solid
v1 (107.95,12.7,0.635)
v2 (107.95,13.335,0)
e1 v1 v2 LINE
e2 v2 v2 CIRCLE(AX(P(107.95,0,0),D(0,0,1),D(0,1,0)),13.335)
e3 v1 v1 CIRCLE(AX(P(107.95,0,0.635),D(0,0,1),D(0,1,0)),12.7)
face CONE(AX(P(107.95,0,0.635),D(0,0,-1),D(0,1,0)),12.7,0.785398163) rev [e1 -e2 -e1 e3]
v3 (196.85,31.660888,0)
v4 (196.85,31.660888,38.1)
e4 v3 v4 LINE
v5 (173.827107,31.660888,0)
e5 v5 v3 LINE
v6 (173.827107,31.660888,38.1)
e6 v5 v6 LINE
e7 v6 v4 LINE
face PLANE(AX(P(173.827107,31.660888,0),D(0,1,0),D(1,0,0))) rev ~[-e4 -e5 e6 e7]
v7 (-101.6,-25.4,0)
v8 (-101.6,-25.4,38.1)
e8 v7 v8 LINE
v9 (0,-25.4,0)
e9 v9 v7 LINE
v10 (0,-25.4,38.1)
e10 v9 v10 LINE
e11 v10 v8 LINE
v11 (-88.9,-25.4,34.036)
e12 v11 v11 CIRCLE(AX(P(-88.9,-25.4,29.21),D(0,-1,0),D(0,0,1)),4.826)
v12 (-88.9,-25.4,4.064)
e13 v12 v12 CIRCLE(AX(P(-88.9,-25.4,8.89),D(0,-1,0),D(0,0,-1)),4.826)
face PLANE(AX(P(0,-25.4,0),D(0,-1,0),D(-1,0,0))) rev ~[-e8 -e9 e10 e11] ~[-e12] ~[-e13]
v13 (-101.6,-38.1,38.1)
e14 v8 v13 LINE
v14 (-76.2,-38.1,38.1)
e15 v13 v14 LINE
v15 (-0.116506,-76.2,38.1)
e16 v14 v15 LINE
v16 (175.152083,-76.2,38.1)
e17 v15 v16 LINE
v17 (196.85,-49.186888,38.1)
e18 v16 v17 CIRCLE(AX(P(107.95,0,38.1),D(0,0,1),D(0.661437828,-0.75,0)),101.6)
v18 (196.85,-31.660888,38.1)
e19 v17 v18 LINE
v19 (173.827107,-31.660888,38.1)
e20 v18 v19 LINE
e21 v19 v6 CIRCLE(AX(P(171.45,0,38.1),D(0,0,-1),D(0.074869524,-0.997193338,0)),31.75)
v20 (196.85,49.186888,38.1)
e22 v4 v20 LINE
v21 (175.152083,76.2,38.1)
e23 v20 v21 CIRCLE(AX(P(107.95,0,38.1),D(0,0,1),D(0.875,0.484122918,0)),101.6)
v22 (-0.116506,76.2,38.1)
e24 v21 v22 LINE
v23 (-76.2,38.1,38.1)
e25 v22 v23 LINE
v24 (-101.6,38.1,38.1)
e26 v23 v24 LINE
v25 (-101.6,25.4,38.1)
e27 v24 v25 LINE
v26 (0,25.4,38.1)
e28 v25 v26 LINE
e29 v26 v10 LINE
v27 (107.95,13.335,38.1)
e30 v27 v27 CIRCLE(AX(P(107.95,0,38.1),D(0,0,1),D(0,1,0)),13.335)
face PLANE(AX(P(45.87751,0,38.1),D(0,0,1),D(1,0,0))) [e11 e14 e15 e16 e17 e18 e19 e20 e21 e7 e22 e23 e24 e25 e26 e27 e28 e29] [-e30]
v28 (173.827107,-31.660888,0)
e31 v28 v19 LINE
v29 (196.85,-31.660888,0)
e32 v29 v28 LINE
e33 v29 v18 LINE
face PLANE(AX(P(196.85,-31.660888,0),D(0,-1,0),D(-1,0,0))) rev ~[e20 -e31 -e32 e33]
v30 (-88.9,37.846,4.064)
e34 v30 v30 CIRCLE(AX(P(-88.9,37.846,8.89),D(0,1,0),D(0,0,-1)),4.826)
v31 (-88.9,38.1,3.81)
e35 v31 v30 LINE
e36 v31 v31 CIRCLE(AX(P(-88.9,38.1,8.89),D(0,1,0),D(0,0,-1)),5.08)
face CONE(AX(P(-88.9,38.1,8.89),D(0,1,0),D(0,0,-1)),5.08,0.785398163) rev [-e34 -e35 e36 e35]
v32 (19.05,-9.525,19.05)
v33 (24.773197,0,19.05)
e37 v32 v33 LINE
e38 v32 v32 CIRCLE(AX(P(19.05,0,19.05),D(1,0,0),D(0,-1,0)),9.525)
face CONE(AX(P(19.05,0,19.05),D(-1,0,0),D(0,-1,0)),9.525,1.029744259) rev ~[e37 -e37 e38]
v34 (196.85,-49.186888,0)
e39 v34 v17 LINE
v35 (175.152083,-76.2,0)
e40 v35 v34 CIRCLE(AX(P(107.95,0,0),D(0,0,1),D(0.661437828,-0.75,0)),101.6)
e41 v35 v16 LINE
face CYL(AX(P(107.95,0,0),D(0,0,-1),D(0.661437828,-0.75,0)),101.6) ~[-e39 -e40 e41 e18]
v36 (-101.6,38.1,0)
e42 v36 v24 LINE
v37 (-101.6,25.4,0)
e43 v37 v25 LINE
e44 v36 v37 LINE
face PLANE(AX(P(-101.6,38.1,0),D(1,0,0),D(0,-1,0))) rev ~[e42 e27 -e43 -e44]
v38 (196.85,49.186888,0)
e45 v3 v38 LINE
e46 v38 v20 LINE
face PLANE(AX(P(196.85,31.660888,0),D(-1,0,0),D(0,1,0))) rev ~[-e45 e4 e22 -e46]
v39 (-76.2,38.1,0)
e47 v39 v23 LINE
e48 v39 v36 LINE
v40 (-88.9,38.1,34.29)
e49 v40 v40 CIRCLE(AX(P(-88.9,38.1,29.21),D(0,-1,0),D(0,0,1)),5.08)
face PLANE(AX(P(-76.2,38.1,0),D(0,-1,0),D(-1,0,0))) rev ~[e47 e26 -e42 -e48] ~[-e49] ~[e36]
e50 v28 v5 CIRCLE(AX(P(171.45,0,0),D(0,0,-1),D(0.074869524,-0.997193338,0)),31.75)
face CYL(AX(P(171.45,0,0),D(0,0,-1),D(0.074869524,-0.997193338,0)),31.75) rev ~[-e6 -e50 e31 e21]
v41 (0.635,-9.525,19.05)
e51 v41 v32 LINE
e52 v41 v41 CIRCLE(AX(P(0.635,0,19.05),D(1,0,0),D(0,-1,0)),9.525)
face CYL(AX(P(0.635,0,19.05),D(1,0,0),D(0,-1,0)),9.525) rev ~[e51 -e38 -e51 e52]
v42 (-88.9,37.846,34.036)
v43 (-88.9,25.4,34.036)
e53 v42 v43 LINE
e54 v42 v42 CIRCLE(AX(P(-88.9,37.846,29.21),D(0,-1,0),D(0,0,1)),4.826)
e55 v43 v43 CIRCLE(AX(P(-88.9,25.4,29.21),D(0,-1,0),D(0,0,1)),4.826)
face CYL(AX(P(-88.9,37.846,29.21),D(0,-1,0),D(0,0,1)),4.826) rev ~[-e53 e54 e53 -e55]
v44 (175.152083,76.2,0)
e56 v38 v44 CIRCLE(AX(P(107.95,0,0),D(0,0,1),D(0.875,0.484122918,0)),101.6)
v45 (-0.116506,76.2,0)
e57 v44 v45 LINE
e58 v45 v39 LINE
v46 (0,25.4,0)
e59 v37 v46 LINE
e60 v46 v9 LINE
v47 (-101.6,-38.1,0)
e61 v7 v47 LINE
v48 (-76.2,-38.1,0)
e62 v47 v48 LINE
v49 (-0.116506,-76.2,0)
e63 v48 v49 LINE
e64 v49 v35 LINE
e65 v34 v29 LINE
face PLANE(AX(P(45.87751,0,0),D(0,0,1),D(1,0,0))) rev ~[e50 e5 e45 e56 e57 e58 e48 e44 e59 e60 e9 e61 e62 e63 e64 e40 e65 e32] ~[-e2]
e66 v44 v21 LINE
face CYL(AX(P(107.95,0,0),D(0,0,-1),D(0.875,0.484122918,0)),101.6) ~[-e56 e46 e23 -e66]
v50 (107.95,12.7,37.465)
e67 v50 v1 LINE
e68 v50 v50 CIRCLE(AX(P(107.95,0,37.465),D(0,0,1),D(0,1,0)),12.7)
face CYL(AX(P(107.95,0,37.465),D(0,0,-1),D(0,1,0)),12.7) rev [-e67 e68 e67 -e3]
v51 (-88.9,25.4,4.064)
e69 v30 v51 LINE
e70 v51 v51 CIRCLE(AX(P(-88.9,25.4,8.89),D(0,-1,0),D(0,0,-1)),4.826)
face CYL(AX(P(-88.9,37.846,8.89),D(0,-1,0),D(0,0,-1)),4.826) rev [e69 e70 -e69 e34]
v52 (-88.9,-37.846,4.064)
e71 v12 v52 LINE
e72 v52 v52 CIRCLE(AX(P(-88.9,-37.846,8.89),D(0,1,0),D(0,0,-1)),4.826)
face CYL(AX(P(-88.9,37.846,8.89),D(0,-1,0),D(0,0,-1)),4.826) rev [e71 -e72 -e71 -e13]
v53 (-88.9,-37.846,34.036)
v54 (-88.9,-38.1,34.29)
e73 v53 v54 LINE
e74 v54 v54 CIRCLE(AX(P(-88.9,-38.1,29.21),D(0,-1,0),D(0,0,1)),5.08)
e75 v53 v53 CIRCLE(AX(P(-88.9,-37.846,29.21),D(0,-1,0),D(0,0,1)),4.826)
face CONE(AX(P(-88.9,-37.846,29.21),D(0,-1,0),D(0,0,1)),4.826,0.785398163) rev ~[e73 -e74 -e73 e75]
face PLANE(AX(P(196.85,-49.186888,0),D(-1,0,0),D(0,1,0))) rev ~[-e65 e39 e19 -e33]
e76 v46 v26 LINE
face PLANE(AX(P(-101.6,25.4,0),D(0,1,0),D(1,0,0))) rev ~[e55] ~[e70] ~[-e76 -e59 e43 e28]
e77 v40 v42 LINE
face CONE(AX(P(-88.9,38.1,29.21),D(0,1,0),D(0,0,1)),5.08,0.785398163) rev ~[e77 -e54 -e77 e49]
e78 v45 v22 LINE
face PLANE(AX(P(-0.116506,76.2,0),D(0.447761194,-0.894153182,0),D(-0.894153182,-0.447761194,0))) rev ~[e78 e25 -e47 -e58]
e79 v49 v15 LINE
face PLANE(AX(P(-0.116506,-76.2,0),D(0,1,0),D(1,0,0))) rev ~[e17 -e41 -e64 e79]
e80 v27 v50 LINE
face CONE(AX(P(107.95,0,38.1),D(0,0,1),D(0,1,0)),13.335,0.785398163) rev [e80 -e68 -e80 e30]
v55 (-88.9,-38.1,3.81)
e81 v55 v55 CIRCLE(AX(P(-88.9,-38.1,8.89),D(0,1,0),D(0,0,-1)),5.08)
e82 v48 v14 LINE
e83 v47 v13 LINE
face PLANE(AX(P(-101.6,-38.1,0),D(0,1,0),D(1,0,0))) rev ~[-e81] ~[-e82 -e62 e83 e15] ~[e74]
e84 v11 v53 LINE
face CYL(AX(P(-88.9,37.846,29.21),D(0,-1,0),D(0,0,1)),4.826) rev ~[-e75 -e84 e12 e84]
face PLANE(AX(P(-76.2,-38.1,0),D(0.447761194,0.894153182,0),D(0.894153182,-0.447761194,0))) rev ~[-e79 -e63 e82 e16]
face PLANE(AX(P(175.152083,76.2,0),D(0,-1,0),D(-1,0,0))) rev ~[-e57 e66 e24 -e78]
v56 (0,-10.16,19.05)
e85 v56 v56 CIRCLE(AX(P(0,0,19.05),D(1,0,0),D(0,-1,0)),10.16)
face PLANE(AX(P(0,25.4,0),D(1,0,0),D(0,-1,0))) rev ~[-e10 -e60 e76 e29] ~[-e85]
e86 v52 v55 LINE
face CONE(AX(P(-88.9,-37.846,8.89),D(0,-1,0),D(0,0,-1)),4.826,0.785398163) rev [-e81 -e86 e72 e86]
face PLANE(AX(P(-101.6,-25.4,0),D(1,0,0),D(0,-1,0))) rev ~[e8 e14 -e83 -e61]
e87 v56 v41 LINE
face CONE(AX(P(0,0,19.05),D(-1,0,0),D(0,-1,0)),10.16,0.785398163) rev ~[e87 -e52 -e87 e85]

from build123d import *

# Parameters (mm, degrees)
F1_DEPTH = 38.1


# Not quite as in the source:
# - a pattern or mirror of a feature is missing from the dataset's text; its kind, count and spacing are read off the source's solid


with BuildPart() as f1:
    # F0 (on Top) → F1 (new body)
    with BuildSketch(Plane.XY):
        with BuildLine():
            Line((0, 25.4), (0, 0))
            Line((0, 0), (0, -25.4))
            Line((0, -25.4), (-101.6, -25.4))
            Line((-101.6, -25.4), (-101.6, -38.1))
            Line((-101.6, -38.1), (-76.2, -38.1))
            Line((-76.2, -38.1), (-0.1165057322, -76.2))
            Line((-0.1165057322, -76.2), (175.152083301, -76.2))
            ThreePointArc((175.152083301, -76.2), (187.161060787, -63.6252139407), (196.85, -49.1868884968))
            Line((196.85, -49.1868884968), (196.85, -31.6608884968))
            Line((196.85, -31.6608884968), (173.8271074, -31.6608884968))
            ThreePointArc((173.8271074, -31.6608884968), (139.7, 0), (173.8271074, 31.6608884968))
            Line((173.8271074, 31.6608884968), (196.85, 31.6608884968))
            Line((196.85, 31.6608884968), (196.85, 49.1868884968))
            ThreePointArc((196.85, 49.1868884968), (187.161060787, 63.6252139407), (175.152083301, 76.2))
            Line((175.152083301, 76.2), (-0.1165057322, 76.2))
            Line((-0.1165057322, 76.2), (-76.2, 38.1))
            Line((-76.2, 38.1), (-101.6, 38.1))
            Line((-101.6, 38.1), (-101.6, 25.4))
            Line((-101.6, 25.4), (0, 25.4))
        make_face()
    extrude(amount=F1_DEPTH)

    # F3 (on offset) → F4 (revolve, cut)
    with BuildSketch(Plane(origin=(107.95, 0, 0), x_dir=(0, -1, 0), z_dir=(-1, 0, 0))):
        Polygon((-13.335, 0), (0, 0), (0, 38.1), (-13.335, 38.1), (-12.7, 37.465), (-12.7, 0.635), align=None)
    revolve(axis=Axis((107.95, 0, 19.05), (0, 0, 1)), mode=Mode.SUBTRACT)

    # F6 (on mid) → F7 (revolve, cut)
    with BuildSketch(Plane.XY.offset(19.05)):
        Polygon((24.7731973962, 0), (0, 0), (0, -10.16), (0.635, -9.525), (19.05, -9.525), align=None)
    revolve(axis=Axis((12.3865986981, 0, 19.05), (1, 0, 0)), mode=Mode.SUBTRACT)

    # F9 (on offset) → F10 (revolve, cut)
    with BuildSketch(Plane(origin=(-88.9, 0, 0), x_dir=(0, -1, 0), z_dir=(-1, 0, 0))):
        Polygon((38.1, 8.89), (-38.1, 8.89), (-38.1, 3.81), (-37.846, 4.064), (37.846, 4.064), (38.1, 3.81), align=None)
    f10 = revolve(axis=Axis((-88.9, 0, 8.89), (0, 1, 0)), mode=Mode.SUBTRACT)

    # F10_copies: F10 across plane
    add(f10.mirror(Plane.XY.offset(19.05)), mode=Mode.SUBTRACT)


solid = f1.part
